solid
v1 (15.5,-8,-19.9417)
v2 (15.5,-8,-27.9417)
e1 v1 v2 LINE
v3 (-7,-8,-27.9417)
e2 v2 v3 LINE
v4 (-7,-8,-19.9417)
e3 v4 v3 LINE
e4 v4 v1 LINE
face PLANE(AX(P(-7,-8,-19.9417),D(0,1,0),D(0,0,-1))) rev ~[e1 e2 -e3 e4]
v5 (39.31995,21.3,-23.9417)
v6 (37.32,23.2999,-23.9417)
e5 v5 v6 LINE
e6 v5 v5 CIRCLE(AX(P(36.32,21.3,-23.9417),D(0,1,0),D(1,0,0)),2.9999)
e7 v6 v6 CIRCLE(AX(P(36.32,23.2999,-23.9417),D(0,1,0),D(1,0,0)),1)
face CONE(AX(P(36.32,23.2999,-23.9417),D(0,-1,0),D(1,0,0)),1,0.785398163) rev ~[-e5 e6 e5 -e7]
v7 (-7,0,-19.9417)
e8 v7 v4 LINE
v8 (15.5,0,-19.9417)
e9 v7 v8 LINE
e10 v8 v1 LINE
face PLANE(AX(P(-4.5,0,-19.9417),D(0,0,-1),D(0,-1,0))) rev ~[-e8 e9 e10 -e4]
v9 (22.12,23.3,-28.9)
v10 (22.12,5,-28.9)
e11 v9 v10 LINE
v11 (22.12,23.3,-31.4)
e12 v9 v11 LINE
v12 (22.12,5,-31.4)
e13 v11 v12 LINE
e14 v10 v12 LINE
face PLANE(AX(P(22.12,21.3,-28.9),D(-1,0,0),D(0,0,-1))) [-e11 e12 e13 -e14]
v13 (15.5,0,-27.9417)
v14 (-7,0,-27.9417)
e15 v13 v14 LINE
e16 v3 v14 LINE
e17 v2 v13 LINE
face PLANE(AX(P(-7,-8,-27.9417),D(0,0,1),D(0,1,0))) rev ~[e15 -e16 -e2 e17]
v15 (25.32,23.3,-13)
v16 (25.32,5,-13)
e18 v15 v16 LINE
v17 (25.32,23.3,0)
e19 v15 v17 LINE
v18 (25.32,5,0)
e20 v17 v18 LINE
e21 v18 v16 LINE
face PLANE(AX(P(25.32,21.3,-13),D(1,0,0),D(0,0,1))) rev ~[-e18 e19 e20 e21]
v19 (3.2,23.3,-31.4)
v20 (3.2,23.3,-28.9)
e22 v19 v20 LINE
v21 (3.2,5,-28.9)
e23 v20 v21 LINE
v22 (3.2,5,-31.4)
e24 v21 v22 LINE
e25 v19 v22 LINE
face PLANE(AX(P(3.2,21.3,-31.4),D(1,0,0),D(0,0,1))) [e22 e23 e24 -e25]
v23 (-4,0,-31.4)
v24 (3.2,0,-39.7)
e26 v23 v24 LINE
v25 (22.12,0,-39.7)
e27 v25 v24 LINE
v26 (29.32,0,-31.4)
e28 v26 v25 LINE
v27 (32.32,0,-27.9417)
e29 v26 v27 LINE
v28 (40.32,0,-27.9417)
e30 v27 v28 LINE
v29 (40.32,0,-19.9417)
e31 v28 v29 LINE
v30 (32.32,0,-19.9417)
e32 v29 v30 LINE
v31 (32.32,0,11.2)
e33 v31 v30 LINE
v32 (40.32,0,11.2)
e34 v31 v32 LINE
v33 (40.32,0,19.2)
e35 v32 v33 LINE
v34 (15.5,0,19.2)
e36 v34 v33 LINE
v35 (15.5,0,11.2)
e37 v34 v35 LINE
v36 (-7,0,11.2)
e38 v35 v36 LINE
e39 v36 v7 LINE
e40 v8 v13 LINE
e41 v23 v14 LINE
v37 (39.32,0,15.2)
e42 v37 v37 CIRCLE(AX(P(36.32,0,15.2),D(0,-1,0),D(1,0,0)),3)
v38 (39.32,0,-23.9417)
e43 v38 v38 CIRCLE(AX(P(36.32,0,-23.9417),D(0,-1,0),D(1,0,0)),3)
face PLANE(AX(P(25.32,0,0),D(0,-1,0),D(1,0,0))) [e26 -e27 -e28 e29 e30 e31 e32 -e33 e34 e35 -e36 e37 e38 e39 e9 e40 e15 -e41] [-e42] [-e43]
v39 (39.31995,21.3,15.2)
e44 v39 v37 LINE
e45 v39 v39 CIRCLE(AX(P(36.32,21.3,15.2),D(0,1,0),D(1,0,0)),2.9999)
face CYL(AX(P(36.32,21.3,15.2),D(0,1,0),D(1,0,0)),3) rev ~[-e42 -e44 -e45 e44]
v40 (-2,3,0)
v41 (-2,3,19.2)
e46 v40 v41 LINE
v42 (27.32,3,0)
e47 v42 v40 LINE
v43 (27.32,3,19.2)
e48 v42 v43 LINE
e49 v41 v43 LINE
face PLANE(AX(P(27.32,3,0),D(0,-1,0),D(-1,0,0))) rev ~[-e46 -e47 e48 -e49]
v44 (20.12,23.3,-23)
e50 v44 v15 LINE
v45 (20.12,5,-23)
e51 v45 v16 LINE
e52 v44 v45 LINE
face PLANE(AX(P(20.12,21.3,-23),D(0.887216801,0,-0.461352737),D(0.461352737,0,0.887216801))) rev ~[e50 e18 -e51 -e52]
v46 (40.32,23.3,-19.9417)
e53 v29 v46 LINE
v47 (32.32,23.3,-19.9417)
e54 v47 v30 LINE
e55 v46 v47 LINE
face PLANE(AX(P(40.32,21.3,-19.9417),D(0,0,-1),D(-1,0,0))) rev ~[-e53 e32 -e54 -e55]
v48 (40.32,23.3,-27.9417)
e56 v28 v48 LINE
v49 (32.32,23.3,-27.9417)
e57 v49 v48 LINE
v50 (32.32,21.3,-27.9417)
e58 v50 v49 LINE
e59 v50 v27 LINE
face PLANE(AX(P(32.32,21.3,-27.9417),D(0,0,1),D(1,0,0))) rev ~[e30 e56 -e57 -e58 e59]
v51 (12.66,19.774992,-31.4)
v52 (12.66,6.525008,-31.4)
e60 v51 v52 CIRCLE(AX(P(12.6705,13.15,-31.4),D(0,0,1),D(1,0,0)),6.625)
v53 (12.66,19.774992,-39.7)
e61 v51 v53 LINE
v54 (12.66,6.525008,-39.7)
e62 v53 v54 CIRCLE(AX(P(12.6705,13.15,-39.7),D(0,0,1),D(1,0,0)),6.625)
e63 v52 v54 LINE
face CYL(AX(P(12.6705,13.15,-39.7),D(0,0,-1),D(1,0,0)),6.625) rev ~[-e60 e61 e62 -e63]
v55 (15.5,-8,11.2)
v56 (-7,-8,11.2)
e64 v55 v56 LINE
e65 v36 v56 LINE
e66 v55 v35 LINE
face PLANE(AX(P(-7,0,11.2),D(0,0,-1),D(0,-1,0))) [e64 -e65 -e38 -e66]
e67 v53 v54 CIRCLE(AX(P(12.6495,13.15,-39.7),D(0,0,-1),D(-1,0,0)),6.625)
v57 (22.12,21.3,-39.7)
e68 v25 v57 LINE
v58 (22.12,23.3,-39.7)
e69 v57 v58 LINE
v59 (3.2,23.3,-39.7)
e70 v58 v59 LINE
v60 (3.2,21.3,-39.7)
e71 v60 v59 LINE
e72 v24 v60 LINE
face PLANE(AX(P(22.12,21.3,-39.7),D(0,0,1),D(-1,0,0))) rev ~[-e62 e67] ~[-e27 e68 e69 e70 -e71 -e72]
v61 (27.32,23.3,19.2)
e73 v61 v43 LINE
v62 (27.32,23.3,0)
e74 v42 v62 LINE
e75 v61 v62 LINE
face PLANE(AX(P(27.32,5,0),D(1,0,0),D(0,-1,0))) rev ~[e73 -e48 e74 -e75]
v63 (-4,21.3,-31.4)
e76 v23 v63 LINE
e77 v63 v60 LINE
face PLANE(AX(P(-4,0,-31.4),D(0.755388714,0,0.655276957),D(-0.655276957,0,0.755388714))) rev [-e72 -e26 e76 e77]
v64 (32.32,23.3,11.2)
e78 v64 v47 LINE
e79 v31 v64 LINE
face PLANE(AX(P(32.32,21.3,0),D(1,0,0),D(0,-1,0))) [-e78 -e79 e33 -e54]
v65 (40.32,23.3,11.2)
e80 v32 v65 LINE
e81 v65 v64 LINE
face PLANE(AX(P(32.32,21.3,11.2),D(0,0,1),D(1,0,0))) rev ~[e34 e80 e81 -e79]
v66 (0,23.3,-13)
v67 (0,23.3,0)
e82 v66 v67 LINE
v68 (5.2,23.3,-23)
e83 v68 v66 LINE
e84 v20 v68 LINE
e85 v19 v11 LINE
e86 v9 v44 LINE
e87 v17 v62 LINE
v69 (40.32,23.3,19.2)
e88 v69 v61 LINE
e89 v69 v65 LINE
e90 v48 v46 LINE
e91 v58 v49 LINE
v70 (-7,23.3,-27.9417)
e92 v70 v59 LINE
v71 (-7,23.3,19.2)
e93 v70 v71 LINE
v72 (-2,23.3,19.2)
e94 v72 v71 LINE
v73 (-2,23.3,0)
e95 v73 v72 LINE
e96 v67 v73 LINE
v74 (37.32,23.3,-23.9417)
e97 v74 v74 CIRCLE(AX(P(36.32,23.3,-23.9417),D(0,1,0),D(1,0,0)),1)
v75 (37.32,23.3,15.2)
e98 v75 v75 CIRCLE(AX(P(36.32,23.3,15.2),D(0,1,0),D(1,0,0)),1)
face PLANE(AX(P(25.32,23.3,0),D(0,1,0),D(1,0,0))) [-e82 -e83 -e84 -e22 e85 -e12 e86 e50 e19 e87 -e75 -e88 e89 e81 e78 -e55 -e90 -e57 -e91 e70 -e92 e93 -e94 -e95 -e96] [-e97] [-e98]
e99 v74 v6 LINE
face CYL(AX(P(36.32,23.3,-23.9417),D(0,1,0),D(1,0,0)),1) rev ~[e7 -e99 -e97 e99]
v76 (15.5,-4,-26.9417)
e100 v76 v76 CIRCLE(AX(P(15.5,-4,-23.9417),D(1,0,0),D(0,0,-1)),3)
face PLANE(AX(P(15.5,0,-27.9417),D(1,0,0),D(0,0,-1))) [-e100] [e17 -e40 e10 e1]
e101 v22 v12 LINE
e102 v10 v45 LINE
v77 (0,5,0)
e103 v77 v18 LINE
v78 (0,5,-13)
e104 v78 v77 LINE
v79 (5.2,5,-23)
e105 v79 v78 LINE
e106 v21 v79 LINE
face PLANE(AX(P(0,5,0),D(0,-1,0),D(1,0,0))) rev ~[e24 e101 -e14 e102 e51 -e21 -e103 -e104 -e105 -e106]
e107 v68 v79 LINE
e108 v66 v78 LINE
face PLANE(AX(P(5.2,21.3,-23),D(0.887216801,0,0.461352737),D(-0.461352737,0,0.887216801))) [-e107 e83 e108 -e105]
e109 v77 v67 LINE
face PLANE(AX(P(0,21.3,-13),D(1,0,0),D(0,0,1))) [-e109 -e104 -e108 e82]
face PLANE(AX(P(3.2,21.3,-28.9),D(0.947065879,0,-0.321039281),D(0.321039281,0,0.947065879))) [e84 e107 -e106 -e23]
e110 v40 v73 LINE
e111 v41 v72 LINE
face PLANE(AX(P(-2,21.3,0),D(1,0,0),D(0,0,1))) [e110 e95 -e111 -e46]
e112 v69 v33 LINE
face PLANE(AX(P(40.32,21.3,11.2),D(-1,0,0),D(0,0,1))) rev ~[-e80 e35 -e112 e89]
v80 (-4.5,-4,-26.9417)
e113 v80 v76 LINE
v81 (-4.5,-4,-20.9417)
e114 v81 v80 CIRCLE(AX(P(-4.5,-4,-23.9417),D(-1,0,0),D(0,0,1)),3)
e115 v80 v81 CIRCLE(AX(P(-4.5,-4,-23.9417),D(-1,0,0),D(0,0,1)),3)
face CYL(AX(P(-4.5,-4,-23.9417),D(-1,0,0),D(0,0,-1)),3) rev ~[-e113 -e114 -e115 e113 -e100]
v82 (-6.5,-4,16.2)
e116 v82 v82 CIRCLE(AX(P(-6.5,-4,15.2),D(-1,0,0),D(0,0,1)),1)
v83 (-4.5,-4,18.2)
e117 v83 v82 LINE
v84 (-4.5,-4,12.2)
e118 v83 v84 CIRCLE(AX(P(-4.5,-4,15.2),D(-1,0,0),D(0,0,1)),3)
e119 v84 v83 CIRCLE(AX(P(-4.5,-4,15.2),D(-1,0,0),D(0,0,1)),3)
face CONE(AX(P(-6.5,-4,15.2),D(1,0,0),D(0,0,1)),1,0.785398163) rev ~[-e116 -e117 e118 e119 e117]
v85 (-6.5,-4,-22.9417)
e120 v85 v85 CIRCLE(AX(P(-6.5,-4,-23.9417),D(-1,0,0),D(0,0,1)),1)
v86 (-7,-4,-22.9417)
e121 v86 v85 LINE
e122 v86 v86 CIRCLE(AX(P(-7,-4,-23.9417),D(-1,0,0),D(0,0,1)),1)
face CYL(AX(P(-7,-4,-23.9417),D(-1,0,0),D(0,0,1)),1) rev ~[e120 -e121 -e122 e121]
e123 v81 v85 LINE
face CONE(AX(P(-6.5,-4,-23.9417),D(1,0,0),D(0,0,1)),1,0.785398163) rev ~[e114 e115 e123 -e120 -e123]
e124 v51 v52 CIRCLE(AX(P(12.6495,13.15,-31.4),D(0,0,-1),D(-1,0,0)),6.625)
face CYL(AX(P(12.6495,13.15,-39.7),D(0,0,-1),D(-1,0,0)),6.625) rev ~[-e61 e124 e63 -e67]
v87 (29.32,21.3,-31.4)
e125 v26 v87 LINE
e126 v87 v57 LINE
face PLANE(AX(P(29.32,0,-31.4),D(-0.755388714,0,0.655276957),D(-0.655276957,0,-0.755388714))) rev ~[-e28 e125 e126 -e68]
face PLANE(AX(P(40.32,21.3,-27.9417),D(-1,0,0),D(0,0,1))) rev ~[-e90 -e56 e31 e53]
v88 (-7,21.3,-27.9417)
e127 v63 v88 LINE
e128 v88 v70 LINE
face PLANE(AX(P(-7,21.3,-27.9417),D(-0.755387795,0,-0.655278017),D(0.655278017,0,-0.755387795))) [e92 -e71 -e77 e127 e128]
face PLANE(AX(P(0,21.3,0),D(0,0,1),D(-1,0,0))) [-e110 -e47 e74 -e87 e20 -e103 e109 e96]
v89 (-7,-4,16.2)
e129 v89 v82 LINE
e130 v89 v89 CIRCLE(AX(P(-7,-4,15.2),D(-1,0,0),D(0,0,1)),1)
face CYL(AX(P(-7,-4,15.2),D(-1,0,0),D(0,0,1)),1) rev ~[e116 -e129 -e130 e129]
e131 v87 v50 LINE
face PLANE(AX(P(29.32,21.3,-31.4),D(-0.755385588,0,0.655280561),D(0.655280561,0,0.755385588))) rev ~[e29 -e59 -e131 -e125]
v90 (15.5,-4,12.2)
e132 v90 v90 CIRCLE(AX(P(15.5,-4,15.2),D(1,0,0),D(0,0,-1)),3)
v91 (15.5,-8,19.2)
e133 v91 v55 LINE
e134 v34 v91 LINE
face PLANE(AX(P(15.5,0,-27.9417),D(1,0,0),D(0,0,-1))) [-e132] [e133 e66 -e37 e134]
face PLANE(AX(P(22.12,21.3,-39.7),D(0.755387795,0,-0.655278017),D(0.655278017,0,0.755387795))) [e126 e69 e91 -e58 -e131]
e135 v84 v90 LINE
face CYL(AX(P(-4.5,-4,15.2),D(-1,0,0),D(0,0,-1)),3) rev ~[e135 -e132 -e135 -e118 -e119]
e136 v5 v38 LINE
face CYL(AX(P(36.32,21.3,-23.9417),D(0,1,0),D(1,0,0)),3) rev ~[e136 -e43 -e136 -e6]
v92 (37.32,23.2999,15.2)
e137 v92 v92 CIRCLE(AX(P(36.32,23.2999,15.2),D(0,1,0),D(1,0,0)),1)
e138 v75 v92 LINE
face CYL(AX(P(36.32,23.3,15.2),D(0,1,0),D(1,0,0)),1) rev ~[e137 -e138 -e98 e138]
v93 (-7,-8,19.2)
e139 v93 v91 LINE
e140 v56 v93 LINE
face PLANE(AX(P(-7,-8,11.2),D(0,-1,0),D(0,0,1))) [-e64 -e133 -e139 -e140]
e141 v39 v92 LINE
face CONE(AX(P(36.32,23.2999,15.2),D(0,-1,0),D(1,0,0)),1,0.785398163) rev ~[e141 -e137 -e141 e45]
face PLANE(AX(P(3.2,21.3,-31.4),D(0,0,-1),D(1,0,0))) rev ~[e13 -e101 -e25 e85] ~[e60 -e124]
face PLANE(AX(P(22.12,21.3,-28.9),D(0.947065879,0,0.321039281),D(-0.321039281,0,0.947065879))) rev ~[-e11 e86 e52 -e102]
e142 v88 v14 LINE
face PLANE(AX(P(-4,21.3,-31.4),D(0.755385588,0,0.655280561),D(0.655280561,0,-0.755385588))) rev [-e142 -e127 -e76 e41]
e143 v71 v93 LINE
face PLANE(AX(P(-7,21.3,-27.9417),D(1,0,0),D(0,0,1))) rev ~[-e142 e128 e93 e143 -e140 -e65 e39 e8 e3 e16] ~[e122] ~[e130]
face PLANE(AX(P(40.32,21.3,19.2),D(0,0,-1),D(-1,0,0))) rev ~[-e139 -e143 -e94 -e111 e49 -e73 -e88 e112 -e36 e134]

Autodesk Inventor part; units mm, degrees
ref_plane "YZ Plane" through (0, 0, 0) normal (1, 0, 0) x (0, 1, 0)
ref_plane "XZ Plane" through (0, 0, 0) normal (0, 1, 0) x (-1, 0, 0)
ref_plane "XY Plane" through (0, 0, 0) normal (0, 0, 1) x (1, 0, 0)
sketch "Sketch1" plane through (0, 0, 0) normal (0, 1, 0) x (-1, 0, 0)
  line L0 (0, 0) -> (-25.32, 0)
  line L1 (-25.32, 0) -> (-25.32, -13)
  line L2 (-25.32, -13) -> (0, -13)
  line L3 (0, -13) -> (0, 0)
  dimension "d0" = 25.32
  dimension "d1" = 13
extrude "Extrusion1" add sketch "Sketch1" along normal blind 5
sketch "Sketch2" plane through (25.32, 0, 0) normal (1, 0, 0) x (0, 0, -1)
  line L0 (0, 0) -> (13, 0)
  line L1 (13, 0) -> (13, 21.3)
  line L2 (13, 21.3) -> (0, 21.3)
  line L3 (0, 21.3) -> (0, 0)
  dimension "d4" = 13
  dimension "d5" = 21.3
extrude "Extrusion2" add sketch "Sketch2" along normal blind 7
sketch "Sketch3" plane through (0, 0, 0) normal (0, -1, 0) x (1, 0, 0)
  line L0 (25.32, -13) -> (0, -13) projected
  line L1 (25.32, -8.0084) -> (25.32, -13)
  line L2 (25.32, -13) -> (25.32, -23) construction
  line L3 (25.32, -23) -> (20.12, -23) construction
  line L4 (20.12, -23) -> (25.32, -13)
  line L5 (20.12, -23) -> (5.2, -23)
  line L6 (0, -23) -> (5.2, -23)
  line L7 (5.2, -23) -> (0, -13)
  line L8 (0, -13) -> (5.2, -23)
  point P0 (0, 0)
  dimension "d8" = 10
  dimension "d9" = 5.2
  dimension "d10" = 5.2
extrude "Extrusion3" add sketch "Sketch3" against normal blind 5
sketch "Sketch4" plane through (0, 0, 0) normal (0, -1, 0) x (1, 0, 0)
  line L0 (20.12, -23) -> (25.32, -13) projected
  line L1 (20.12, -23) -> (27.32, -23)
  line L2 (25.32, -13) -> (32.32, -13) projected
  line L3 (32.32, -13) -> (27.32, -23)
  point P0 (0, 0)
  dimension "d13" = 7.2
extrude "Extrusion4" add sketch "Sketch4" against normal blind 21.3
sketch "Sketch5" plane through (0, 0, 0) normal (0, -1, 0) x (1, 0, 0)
  line L0 (20.12, -23) -> (5.2, -23) projected
  line L1 (20.12, -23) -> (20.12, -28.9) construction
  line L2 (20.12, -28.9) -> (22.12, -28.9) construction
  line L3 (20.12, -23) -> (25.32, -13) projected
  line L4 (22.12, -28.9) -> (20.12, -23)
  line L5 (27.32, -23) -> (20.12, -23) projected
  line L6 (27.32, -23) -> (27.32, -28.9)
  line L7 (27.32, -28.9) -> (29.32, -28.9) construction
  line L8 (29.32, -28.9) -> (27.32, -23)
  line L9 (29.32, -28.9) -> (22.12, -28.9)
  line L10 (5.2, -23) -> (5.2, -28.9) construction
  line L11 (5.2, -28.9) -> (3.2, -28.9) construction
  line L12 (3.2, -28.9) -> (5.2, -23)
  line L13 (22.12, -28.9) -> (3.2, -28.9)
  point P0 (0, 0)
  dimension "d16" = 5.9
  dimension "d17" = 2
  dimension "d18" = 2
  dimension "d19" = 2
extrude "Extrusion5" add sketch "Sketch5" against normal blind 5 contours L4 L13 L12 L0
sketch "Sketch6" plane through (0, 0, 0) normal (0, -1, 0) x (1, 0, 0)
  line L0 (20.12, -23) -> (27.32, -23) projected
  line L1 (27.32, -23) -> (27.32, -28.9) construction
  line L2 (27.32, -28.9) -> (29.32, -28.9) construction
  line L3 (29.32, -28.9) -> (27.32, -23)
  line L4 (20.12, -23) -> (22.12, -28.9) projected
  line L5 (29.32, -28.9) -> (22.12, -28.9)
  point P0 (0, 0)
  dimension "d22" = 5.9
  dimension "d23" = 2
extrude "Extrusion6" add sketch "Sketch6" against normal blind 21.3
sketch "Sketch7" plane through (0, 0, 0) normal (0, -1, 0) x (1, 0, 0)
  line L0 (22.12, -28.9) -> (3.2, -28.9) projected
  line L1 (22.12, -28.9) -> (22.12, -31.4)
  line L2 (3.2, -28.9) -> (5.2, -23) projected
  line L3 (3.2, -28.9) -> (3.2, -31.4)
  line L4 (3.2, -31.4) -> (22.12, -31.4)
  point P0 (0, 0)
  dimension "d26" = 2.5
  dimension "d27" = 2.5
extrude "Extrusion7" add sketch "Sketch7" against normal blind 5
sketch "Sketch8" plane through (0, 0, 0) normal (0, -1, 0) x (1, 0, 0)
  line L0 (27.32, -23) -> (29.32, -28.9) projected
  line L1 (22.12, -28.9) -> (22.12, -31.4) projected
  line L2 (29.32, -28.9) -> (22.12, -28.9)
  line L3 (22.12, -28.9) -> (22.12, -31.4)
  line L4 (22.12, -31.4) -> (29.32, -31.4)
  line L5 (29.32, -31.4) -> (29.32, -28.9)
  point P0 (0, 0)
extrude "Extrusion8" add sketch "Sketch8" against normal blind 21.3
sketch "Sketch9" plane through (0, 0, 0) normal (0, -1, 0) x (1, 0, 0)
  line L0 (22.12, -31.4) -> (3.2, -31.4) projected
  line L1 (3.2, -31.4) -> (22.12, -31.4)
  line L2 (22.12, -31.4) -> (22.12, -39.7)
  line L3 (22.12, -39.7) -> (3.2, -39.7)
  line L4 (3.2, -39.7) -> (3.2, -31.4)
  point P0 (0, 0)
  dimension "d32" = 18.92
  dimension "d33" = 8.3
extrude "Extrusion9" add sketch "Sketch9" against normal blind 21.3
sketch "Sketch10" plane through (0, 0, 0) normal (0, -1, 0) x (1, 0, 0)
  line L0 (22.12, -31.4) -> (29.32, -31.4) projected
  line L1 (22.12, -31.4) -> (22.12, -39.7) projected
  line L2 (29.32, -31.4) -> (22.12, -39.7)
  point P0 (0, 0)
extrude "Extrusion10" add sketch "Sketch10" against normal blind 21.3
sketch "Sketch11" plane through (3.2, 0, -39.7) normal (0, 0, -1) x (-1, 0, 0)
  line L0 (0, 5) -> (-2, 5) projected
  line L1 (0, 5) -> (-18.878, 5) construction
  line L2 (0, 21.3) -> (-18.92, 21.3) projected
  line L3 (-9.46, 21.3) -> (-9.439, 5) construction
  line L4 (-9.4495, 13.15) -> (0, 13.1622) construction
  line L5 (0, 0) -> (0, 21.3) projected
  circle A0 centre (-9.4495, 13.15) radius 6.625
  point P0 (3.2, 0)
  dimension "d38" = 13.25
extrude "Extrusion11" cut sketch "Sketch11" against normal blind 21.3
sketch "Sketch12" plane through (25.32, 21.3, 0) normal (0, 1, 0) x (1, 0, 0)
  line L0 (7, 13) -> (2, 23) projected
  line L1 (4, 31.4) -> (4, 28.9) projected
  line L2 (7, 13) -> (4, 31.4)
  line L3 (2, 23) -> (4, 28.9) projected
  line L4 (2, 23) -> (4, 28.9)
  line L5 (4, 28.9) -> (4, 31.4)
  line L6 (7, 13) -> (2, 23)
  point P0 (-25.32, 0)
extrude "Extrusion12" add sketch "Sketch12" against normal blind 21.3
sketch "Sketch13" plane through (25.32, 21.3, 0) normal (0, 1, 0) x (1, 0, 0)
  line L0 (4, 31.4) -> (7, 13) projected
  line L1 (7, 13) -> (7, 31.4) construction
  line L2 (4, 31.4) -> (7, 27.9417)
  line L3 (4, 31.4) -> (-3.2, 39.7) projected
  line L4 (7, 27.9417) -> (7, 13)
  line L5 (7, 13) -> (4, 31.4)
  point P0 (-25.32, 0)
extrude "Extrusion13" add sketch "Sketch13" against normal blind 21.3
ref_plane "Work Plane1" through (12.66, 5, 0) normal (1, 0, 0) x (0, 1, 0)
mirror "Mirror1" about plane through (12.66, 5, 0) normal (1, 0, 0)
sketch "Sketch16" plane through (25.32, 5, 0) normal (0, 0, 1) x (1, 0, 0)
  line L0 (-20.12, 0) -> (-25.32, 0) projected
  line L1 (-25.32, 0) -> (-25.32, -2) construction
  line L2 (-25.32, -2) -> (-27.32, -2)
  line L3 (-27.32, -2) -> (-27.32, 16.3)
  line L4 (-25.32, 16.3) -> (-32.32, 16.3) projected
  line L5 (0, 0) -> (2, 0) construction
  line L6 (2, 0) -> (2, -2)
  line L7 (2, -2) -> (-25.32, -2)
  line L8 (2, 0) -> (2, 16.3)
  line L9 (-27.32, 16.3) -> (-32.32, 16.3)
  line L10 (-32.32, 16.3) -> (-32.32, -5) projected
  line L11 (-32.32, 16.3) -> (-32.32, -5)
  line L12 (-32.32, -5) -> (7, -5)
  line L13 (7, 16.3) -> (7, -5) projected
  line L14 (7, -5) -> (7, 16.3)
  line L15 (7, 16.3) -> (2, 16.3)
  line L16 (0, 16.3) -> (7, 16.3) projected
  point P0 (-25.32, -5)
  dimension "d45" = 2
  dimension "d46" = 2
  dimension "d47" = 2
  dimension "d48" = 2
extrude "Extrusion14" add sketch "Sketch16" along normal blind 19.2
sketch "Sketch22" plane through (-7, 0, -27.9417) normal (-1, 0, 0) x (0, 0, 1)
  line L0 (-11.7583, 0) -> (0, 0) projected
  line L1 (0, 0) -> (8, 0)
  line L2 (8, 0) -> (8, -8)
  line L3 (8, -8) -> (0, -8)
  line L4 (0, -8) -> (0, 0)
  line L5 (47.1417, 0) -> (0, 0) projected
  line L6 (47.1417, 0) -> (39.1417, 0)
  line L7 (39.1417, 0) -> (39.1417, -8)
  line L8 (39.1417, -8) -> (47.1417, -8)
  line L9 (47.1417, -8) -> (47.1417, 0)
  line L10 (0, -4) -> (47.1417, -4) construction
  line L11 (4, -8) -> (4, -4) construction
  line L12 (43.1417, -8) -> (43.1417, -4) construction
  circle A0 centre (4, -4) radius 1
  circle A1 centre (43.1417, -4) radius 1
  point P0 (27.9417, 0)
  dimension "d81" = 8
  dimension "d82" = 8
  dimension "d83" = 8
  dimension "d84" = 8
  dimension "d85" = 2
  dimension "d86" = 2
extrude "Extrusion20" add sketch "Sketch22" against normal blind 2.5
chamfer "Chamfer2" distance 2 angle 45 2 edges at (-4.5, -4, -24.9417) (-4.5, -4, 14.2)
sketch "Sketch24" plane through (25.32, 21.3, 0) normal (0, 1, 0) x (1, 0, 0)
  line L0 (-27.32, -19.2) -> (-32.32, -19.2) projected
  line L1 (-27.32, -19.2) -> (-32.32, -19.2)
  line L2 (-32.32, 27.9417) -> (-32.32, -19.2) projected
  line L3 (-32.32, -19.2) -> (-32.32, 27.9417)
  line L4 (-32.32, 27.9417) -> (-22.12, 39.7) projected
  line L5 (-32.32, 27.9417) -> (-22.12, 39.7)
  line L6 (-3.2, 39.7) -> (-22.12, 39.7) projected
  line L7 (-22.12, 39.7) -> (-3.2, 39.7)
  line L8 (-3.2, 39.7) -> (7, 27.9417)
  line L9 (7, -19.2) -> (7, 27.9417) projected
  line L10 (7, 27.9417) -> (7, -19.2)
  line L11 (7, -19.2) -> (2, -19.2) projected
  line L12 (7, -19.2) -> (2, -19.2)
  line L13 (0, 0) -> (2, 0) projected
  line L14 (2, -19.2) -> (2, 0)
  line L15 (2, 0) -> (0, 0)
  line L16 (0, 13) -> (0, 0) projected
  line L17 (0, 0) -> (0, 13)
  line L18 (-5.2, 23) -> (0, 13) projected
  line L19 (0, 13) -> (-5.2, 23)
  line L20 (-3.2, 28.9) -> (-5.2, 23) projected
  line L21 (-5.2, 23) -> (-3.2, 28.9)
  line L22 (-3.2, 28.9) -> (-3.2, 31.4)
  line L23 (-22.12, 31.4) -> (-3.2, 31.4) projected
  line L24 (-3.2, 31.4) -> (-22.12, 31.4)
  line L25 (-22.12, 31.4) -> (-22.12, 28.9) projected
  line L26 (-22.12, 31.4) -> (-22.12, 28.9)
  line L27 (-22.12, 28.9) -> (-20.12, 23) projected
  line L28 (-22.12, 28.9) -> (-20.12, 23)
  line L29 (-20.12, 23) -> (-25.32, 13) projected
  line L30 (-20.12, 23) -> (-25.32, 13)
  line L31 (-25.32, 13) -> (-25.32, 0) projected
  line L32 (-25.32, 13) -> (-25.32, 0)
  line L33 (-25.32, 0) -> (-27.32, 0) projected
  line L34 (-25.32, 0) -> (-27.32, 0)
  line L35 (-27.32, 0) -> (-27.32, -19.2) projected
  line L36 (-27.32, 0) -> (-27.32, -19.2)
  line L37 (-25.32, 13) -> (-25.32, 0) projected
  line L38 (0, 0) -> (-25.32, 0)
extrude "Extrusion22" add sketch "Sketch24" along normal blind 2 contours L0 L2 L4 L6 L8 L9 L11 L14 L13 L16 L18 L20 L22 L23 L25 L27 L29 L31 L33 L35
sketch "Sketch25" plane through (25.32, 23.3, 0) normal (0, 1, 0) x (1, 0, 0)
  line L0 (2, -19.2) -> (7, -19.2) projected
  line L1 (7, -19.2) -> (15, -19.2)
  line L2 (15, -19.2) -> (15, -11.2)
  line L3 (15, -11.2) -> (7, -11.2)
  line L4 (7, -11.2) -> (7, -19.2)
  line L5 (7, -19.2) -> (7, 27.9417) projected
  line L6 (7, 27.9417) -> (15, 27.9417)
  line L7 (15, 27.9417) -> (15, 19.9417)
  line L8 (15, 19.9417) -> (7, 19.9417)
  line L9 (7, 19.9417) -> (7, 27.9417)
  line L10 (11, -19.2) -> (11, 27.9417) construction
  line L11 (15, -15.2) -> (11, -15.2) construction
  line L12 (15, 23.9417) -> (11, 23.9417) construction
  circle A0 centre (11, -15.2) radius 1
  circle A1 centre (11, 23.9417) radius 1
  point P0 (-25.32, 0)
  dimension "d96" = 8
  dimension "d97" = 8
  dimension "d98" = 8
  dimension "d99" = 8
  dimension "d100" = 2
  dimension "d101" = 2
extrude "Extrusion23" add sketch "Sketch25" against normal blind 2
chamfer "Chamfer3" distance 2 angle 45 2 edges at (35.32, 21.3, 15.2) (35.32, 21.3, -23.9417)
sketch "Sketch26" plane through (25.32, 21.3, 0) normal (0, -1, 0) x (1, 0, 0)
  circle A0 centre (11, 15.2) radius 1 projected
  circle A1 centre (11, 15.2) radius 3 projected
  line L0 (15, 19.2) -> (7, 19.2) projected
  line L1 (7, 11.2) -> (7, 19.2) projected
  line L2 (7, 11.2) -> (15, 11.2) projected
  line L3 (15, 11.2) -> (15, 19.2) projected
  circle A2 centre (11, 15.2) radius 3 projected
  circle A3 centre (11, 15.2) radius 3
  line L4 (15, 19.2) -> (7, 19.2) projected
  line L5 (15, 19.2) -> (7, 19.2)
  line L6 (7, 19.2) -> (7, 11.2)
  line L7 (7, 11.2) -> (15, 11.2)
  line L8 (15, 11.2) -> (15, 19.2)
  point P0 (-25.32, 0)
extrude "Extrusion24" add sketch "Sketch26" along normal blind 21.3 contours L3 L2 L1 L0
sketch "Sketch28" plane through (25.32, 21.3, 0) normal (0, -1, 0) x (1, 0, 0)
  circle A0 centre (11, -23.9417) radius 1 projected
  circle A1 centre (11, -23.9417) radius 3 projected
  line L0 (7, -27.9417) -> (7, -19.9417) projected
  line L1 (7, -27.9417) -> (15, -27.9417) projected
  line L2 (15, -27.9417) -> (15, -19.9417) projected
  line L3 (15, -19.9417) -> (7, -19.9417) projected
  circle A2 centre (11, -23.9417) radius 3 projected
  circle A3 centre (11, -23.9417) radius 3
  line L4 (7, -27.9417) -> (-3.2, -39.7) projected
  line L5 (15, -19.9417) -> (15, -27.9417) projected
  line L6 (7, -27.9417) -> (15, -27.9417)
  line L7 (15, -27.9417) -> (15, -19.9417)
  line L8 (15, -19.9417) -> (7, -19.9417)
  line L9 (7, -19.9417) -> (7, -27.9417)
  point P0 (-25.32, 0)
extrude "Extrusion25" add sketch "Sketch28" along normal blind 21.3 contours L0 L3 L2 L1
sketch "Sketch29" plane through (-4.5, 0, -27.9417) normal (1, 0, 0) x (0, 0, -1)
  circle A0 centre (-43.1417, -4) radius 1 projected
  circle A1 centre (-43.1417, -4) radius 3 projected
  line L0 (-47.1417, 0) -> (-39.1417, 0) projected
  line L1 (-47.1417, 0) -> (-47.1417, -8) projected
  line L2 (-47.1417, -8) -> (-39.1417, -8) projected
  line L3 (-39.1417, -8) -> (-39.1417, 0) projected
  circle A2 centre (-43.1417, -4) radius 3 projected
  circle A3 centre (-4, -4) radius 1 projected
  circle A4 centre (-4, -4) radius 3 projected
  line L4 (0, -8) -> (0, 0) projected
  line L5 (-8, 0) -> (0, 0) projected
  line L6 (-8, 0) -> (-8, -8) projected
  line L7 (-8, -8) -> (0, -8) projected
  circle A5 centre (-4, -4) radius 3 projected
  line L8 (-39.1417, -8) -> (-47.1417, -8)
  line L9 (-47.1417, -8) -> (-47.1417, 0)
  line L10 (-47.1417, 0) -> (-39.1417, 0)
  line L11 (-39.1417, 0) -> (-39.1417, -8)
  line L12 (-8, -8) -> (0, -8) projected
  line L13 (0, -8) -> (-8, -8)
  line L14 (-8, -8) -> (-8, 0)
  line L15 (-8, 0) -> (0, 0)
  line L16 (0, 0) -> (0, -8)
  circle A6 centre (-43.1417, -4) radius 3
  circle A7 centre (-4, -4) radius 1 projected
  circle A8 centre (-4, -4) radius 3
  point P0 (-27.9417, 0)
extrude "Extrusion26" add sketch "Sketch29" along normal blind 20 contours L0 L3 L2 L1 | L7 L6 L5 L4
properties part number "AC_wire_holder"
